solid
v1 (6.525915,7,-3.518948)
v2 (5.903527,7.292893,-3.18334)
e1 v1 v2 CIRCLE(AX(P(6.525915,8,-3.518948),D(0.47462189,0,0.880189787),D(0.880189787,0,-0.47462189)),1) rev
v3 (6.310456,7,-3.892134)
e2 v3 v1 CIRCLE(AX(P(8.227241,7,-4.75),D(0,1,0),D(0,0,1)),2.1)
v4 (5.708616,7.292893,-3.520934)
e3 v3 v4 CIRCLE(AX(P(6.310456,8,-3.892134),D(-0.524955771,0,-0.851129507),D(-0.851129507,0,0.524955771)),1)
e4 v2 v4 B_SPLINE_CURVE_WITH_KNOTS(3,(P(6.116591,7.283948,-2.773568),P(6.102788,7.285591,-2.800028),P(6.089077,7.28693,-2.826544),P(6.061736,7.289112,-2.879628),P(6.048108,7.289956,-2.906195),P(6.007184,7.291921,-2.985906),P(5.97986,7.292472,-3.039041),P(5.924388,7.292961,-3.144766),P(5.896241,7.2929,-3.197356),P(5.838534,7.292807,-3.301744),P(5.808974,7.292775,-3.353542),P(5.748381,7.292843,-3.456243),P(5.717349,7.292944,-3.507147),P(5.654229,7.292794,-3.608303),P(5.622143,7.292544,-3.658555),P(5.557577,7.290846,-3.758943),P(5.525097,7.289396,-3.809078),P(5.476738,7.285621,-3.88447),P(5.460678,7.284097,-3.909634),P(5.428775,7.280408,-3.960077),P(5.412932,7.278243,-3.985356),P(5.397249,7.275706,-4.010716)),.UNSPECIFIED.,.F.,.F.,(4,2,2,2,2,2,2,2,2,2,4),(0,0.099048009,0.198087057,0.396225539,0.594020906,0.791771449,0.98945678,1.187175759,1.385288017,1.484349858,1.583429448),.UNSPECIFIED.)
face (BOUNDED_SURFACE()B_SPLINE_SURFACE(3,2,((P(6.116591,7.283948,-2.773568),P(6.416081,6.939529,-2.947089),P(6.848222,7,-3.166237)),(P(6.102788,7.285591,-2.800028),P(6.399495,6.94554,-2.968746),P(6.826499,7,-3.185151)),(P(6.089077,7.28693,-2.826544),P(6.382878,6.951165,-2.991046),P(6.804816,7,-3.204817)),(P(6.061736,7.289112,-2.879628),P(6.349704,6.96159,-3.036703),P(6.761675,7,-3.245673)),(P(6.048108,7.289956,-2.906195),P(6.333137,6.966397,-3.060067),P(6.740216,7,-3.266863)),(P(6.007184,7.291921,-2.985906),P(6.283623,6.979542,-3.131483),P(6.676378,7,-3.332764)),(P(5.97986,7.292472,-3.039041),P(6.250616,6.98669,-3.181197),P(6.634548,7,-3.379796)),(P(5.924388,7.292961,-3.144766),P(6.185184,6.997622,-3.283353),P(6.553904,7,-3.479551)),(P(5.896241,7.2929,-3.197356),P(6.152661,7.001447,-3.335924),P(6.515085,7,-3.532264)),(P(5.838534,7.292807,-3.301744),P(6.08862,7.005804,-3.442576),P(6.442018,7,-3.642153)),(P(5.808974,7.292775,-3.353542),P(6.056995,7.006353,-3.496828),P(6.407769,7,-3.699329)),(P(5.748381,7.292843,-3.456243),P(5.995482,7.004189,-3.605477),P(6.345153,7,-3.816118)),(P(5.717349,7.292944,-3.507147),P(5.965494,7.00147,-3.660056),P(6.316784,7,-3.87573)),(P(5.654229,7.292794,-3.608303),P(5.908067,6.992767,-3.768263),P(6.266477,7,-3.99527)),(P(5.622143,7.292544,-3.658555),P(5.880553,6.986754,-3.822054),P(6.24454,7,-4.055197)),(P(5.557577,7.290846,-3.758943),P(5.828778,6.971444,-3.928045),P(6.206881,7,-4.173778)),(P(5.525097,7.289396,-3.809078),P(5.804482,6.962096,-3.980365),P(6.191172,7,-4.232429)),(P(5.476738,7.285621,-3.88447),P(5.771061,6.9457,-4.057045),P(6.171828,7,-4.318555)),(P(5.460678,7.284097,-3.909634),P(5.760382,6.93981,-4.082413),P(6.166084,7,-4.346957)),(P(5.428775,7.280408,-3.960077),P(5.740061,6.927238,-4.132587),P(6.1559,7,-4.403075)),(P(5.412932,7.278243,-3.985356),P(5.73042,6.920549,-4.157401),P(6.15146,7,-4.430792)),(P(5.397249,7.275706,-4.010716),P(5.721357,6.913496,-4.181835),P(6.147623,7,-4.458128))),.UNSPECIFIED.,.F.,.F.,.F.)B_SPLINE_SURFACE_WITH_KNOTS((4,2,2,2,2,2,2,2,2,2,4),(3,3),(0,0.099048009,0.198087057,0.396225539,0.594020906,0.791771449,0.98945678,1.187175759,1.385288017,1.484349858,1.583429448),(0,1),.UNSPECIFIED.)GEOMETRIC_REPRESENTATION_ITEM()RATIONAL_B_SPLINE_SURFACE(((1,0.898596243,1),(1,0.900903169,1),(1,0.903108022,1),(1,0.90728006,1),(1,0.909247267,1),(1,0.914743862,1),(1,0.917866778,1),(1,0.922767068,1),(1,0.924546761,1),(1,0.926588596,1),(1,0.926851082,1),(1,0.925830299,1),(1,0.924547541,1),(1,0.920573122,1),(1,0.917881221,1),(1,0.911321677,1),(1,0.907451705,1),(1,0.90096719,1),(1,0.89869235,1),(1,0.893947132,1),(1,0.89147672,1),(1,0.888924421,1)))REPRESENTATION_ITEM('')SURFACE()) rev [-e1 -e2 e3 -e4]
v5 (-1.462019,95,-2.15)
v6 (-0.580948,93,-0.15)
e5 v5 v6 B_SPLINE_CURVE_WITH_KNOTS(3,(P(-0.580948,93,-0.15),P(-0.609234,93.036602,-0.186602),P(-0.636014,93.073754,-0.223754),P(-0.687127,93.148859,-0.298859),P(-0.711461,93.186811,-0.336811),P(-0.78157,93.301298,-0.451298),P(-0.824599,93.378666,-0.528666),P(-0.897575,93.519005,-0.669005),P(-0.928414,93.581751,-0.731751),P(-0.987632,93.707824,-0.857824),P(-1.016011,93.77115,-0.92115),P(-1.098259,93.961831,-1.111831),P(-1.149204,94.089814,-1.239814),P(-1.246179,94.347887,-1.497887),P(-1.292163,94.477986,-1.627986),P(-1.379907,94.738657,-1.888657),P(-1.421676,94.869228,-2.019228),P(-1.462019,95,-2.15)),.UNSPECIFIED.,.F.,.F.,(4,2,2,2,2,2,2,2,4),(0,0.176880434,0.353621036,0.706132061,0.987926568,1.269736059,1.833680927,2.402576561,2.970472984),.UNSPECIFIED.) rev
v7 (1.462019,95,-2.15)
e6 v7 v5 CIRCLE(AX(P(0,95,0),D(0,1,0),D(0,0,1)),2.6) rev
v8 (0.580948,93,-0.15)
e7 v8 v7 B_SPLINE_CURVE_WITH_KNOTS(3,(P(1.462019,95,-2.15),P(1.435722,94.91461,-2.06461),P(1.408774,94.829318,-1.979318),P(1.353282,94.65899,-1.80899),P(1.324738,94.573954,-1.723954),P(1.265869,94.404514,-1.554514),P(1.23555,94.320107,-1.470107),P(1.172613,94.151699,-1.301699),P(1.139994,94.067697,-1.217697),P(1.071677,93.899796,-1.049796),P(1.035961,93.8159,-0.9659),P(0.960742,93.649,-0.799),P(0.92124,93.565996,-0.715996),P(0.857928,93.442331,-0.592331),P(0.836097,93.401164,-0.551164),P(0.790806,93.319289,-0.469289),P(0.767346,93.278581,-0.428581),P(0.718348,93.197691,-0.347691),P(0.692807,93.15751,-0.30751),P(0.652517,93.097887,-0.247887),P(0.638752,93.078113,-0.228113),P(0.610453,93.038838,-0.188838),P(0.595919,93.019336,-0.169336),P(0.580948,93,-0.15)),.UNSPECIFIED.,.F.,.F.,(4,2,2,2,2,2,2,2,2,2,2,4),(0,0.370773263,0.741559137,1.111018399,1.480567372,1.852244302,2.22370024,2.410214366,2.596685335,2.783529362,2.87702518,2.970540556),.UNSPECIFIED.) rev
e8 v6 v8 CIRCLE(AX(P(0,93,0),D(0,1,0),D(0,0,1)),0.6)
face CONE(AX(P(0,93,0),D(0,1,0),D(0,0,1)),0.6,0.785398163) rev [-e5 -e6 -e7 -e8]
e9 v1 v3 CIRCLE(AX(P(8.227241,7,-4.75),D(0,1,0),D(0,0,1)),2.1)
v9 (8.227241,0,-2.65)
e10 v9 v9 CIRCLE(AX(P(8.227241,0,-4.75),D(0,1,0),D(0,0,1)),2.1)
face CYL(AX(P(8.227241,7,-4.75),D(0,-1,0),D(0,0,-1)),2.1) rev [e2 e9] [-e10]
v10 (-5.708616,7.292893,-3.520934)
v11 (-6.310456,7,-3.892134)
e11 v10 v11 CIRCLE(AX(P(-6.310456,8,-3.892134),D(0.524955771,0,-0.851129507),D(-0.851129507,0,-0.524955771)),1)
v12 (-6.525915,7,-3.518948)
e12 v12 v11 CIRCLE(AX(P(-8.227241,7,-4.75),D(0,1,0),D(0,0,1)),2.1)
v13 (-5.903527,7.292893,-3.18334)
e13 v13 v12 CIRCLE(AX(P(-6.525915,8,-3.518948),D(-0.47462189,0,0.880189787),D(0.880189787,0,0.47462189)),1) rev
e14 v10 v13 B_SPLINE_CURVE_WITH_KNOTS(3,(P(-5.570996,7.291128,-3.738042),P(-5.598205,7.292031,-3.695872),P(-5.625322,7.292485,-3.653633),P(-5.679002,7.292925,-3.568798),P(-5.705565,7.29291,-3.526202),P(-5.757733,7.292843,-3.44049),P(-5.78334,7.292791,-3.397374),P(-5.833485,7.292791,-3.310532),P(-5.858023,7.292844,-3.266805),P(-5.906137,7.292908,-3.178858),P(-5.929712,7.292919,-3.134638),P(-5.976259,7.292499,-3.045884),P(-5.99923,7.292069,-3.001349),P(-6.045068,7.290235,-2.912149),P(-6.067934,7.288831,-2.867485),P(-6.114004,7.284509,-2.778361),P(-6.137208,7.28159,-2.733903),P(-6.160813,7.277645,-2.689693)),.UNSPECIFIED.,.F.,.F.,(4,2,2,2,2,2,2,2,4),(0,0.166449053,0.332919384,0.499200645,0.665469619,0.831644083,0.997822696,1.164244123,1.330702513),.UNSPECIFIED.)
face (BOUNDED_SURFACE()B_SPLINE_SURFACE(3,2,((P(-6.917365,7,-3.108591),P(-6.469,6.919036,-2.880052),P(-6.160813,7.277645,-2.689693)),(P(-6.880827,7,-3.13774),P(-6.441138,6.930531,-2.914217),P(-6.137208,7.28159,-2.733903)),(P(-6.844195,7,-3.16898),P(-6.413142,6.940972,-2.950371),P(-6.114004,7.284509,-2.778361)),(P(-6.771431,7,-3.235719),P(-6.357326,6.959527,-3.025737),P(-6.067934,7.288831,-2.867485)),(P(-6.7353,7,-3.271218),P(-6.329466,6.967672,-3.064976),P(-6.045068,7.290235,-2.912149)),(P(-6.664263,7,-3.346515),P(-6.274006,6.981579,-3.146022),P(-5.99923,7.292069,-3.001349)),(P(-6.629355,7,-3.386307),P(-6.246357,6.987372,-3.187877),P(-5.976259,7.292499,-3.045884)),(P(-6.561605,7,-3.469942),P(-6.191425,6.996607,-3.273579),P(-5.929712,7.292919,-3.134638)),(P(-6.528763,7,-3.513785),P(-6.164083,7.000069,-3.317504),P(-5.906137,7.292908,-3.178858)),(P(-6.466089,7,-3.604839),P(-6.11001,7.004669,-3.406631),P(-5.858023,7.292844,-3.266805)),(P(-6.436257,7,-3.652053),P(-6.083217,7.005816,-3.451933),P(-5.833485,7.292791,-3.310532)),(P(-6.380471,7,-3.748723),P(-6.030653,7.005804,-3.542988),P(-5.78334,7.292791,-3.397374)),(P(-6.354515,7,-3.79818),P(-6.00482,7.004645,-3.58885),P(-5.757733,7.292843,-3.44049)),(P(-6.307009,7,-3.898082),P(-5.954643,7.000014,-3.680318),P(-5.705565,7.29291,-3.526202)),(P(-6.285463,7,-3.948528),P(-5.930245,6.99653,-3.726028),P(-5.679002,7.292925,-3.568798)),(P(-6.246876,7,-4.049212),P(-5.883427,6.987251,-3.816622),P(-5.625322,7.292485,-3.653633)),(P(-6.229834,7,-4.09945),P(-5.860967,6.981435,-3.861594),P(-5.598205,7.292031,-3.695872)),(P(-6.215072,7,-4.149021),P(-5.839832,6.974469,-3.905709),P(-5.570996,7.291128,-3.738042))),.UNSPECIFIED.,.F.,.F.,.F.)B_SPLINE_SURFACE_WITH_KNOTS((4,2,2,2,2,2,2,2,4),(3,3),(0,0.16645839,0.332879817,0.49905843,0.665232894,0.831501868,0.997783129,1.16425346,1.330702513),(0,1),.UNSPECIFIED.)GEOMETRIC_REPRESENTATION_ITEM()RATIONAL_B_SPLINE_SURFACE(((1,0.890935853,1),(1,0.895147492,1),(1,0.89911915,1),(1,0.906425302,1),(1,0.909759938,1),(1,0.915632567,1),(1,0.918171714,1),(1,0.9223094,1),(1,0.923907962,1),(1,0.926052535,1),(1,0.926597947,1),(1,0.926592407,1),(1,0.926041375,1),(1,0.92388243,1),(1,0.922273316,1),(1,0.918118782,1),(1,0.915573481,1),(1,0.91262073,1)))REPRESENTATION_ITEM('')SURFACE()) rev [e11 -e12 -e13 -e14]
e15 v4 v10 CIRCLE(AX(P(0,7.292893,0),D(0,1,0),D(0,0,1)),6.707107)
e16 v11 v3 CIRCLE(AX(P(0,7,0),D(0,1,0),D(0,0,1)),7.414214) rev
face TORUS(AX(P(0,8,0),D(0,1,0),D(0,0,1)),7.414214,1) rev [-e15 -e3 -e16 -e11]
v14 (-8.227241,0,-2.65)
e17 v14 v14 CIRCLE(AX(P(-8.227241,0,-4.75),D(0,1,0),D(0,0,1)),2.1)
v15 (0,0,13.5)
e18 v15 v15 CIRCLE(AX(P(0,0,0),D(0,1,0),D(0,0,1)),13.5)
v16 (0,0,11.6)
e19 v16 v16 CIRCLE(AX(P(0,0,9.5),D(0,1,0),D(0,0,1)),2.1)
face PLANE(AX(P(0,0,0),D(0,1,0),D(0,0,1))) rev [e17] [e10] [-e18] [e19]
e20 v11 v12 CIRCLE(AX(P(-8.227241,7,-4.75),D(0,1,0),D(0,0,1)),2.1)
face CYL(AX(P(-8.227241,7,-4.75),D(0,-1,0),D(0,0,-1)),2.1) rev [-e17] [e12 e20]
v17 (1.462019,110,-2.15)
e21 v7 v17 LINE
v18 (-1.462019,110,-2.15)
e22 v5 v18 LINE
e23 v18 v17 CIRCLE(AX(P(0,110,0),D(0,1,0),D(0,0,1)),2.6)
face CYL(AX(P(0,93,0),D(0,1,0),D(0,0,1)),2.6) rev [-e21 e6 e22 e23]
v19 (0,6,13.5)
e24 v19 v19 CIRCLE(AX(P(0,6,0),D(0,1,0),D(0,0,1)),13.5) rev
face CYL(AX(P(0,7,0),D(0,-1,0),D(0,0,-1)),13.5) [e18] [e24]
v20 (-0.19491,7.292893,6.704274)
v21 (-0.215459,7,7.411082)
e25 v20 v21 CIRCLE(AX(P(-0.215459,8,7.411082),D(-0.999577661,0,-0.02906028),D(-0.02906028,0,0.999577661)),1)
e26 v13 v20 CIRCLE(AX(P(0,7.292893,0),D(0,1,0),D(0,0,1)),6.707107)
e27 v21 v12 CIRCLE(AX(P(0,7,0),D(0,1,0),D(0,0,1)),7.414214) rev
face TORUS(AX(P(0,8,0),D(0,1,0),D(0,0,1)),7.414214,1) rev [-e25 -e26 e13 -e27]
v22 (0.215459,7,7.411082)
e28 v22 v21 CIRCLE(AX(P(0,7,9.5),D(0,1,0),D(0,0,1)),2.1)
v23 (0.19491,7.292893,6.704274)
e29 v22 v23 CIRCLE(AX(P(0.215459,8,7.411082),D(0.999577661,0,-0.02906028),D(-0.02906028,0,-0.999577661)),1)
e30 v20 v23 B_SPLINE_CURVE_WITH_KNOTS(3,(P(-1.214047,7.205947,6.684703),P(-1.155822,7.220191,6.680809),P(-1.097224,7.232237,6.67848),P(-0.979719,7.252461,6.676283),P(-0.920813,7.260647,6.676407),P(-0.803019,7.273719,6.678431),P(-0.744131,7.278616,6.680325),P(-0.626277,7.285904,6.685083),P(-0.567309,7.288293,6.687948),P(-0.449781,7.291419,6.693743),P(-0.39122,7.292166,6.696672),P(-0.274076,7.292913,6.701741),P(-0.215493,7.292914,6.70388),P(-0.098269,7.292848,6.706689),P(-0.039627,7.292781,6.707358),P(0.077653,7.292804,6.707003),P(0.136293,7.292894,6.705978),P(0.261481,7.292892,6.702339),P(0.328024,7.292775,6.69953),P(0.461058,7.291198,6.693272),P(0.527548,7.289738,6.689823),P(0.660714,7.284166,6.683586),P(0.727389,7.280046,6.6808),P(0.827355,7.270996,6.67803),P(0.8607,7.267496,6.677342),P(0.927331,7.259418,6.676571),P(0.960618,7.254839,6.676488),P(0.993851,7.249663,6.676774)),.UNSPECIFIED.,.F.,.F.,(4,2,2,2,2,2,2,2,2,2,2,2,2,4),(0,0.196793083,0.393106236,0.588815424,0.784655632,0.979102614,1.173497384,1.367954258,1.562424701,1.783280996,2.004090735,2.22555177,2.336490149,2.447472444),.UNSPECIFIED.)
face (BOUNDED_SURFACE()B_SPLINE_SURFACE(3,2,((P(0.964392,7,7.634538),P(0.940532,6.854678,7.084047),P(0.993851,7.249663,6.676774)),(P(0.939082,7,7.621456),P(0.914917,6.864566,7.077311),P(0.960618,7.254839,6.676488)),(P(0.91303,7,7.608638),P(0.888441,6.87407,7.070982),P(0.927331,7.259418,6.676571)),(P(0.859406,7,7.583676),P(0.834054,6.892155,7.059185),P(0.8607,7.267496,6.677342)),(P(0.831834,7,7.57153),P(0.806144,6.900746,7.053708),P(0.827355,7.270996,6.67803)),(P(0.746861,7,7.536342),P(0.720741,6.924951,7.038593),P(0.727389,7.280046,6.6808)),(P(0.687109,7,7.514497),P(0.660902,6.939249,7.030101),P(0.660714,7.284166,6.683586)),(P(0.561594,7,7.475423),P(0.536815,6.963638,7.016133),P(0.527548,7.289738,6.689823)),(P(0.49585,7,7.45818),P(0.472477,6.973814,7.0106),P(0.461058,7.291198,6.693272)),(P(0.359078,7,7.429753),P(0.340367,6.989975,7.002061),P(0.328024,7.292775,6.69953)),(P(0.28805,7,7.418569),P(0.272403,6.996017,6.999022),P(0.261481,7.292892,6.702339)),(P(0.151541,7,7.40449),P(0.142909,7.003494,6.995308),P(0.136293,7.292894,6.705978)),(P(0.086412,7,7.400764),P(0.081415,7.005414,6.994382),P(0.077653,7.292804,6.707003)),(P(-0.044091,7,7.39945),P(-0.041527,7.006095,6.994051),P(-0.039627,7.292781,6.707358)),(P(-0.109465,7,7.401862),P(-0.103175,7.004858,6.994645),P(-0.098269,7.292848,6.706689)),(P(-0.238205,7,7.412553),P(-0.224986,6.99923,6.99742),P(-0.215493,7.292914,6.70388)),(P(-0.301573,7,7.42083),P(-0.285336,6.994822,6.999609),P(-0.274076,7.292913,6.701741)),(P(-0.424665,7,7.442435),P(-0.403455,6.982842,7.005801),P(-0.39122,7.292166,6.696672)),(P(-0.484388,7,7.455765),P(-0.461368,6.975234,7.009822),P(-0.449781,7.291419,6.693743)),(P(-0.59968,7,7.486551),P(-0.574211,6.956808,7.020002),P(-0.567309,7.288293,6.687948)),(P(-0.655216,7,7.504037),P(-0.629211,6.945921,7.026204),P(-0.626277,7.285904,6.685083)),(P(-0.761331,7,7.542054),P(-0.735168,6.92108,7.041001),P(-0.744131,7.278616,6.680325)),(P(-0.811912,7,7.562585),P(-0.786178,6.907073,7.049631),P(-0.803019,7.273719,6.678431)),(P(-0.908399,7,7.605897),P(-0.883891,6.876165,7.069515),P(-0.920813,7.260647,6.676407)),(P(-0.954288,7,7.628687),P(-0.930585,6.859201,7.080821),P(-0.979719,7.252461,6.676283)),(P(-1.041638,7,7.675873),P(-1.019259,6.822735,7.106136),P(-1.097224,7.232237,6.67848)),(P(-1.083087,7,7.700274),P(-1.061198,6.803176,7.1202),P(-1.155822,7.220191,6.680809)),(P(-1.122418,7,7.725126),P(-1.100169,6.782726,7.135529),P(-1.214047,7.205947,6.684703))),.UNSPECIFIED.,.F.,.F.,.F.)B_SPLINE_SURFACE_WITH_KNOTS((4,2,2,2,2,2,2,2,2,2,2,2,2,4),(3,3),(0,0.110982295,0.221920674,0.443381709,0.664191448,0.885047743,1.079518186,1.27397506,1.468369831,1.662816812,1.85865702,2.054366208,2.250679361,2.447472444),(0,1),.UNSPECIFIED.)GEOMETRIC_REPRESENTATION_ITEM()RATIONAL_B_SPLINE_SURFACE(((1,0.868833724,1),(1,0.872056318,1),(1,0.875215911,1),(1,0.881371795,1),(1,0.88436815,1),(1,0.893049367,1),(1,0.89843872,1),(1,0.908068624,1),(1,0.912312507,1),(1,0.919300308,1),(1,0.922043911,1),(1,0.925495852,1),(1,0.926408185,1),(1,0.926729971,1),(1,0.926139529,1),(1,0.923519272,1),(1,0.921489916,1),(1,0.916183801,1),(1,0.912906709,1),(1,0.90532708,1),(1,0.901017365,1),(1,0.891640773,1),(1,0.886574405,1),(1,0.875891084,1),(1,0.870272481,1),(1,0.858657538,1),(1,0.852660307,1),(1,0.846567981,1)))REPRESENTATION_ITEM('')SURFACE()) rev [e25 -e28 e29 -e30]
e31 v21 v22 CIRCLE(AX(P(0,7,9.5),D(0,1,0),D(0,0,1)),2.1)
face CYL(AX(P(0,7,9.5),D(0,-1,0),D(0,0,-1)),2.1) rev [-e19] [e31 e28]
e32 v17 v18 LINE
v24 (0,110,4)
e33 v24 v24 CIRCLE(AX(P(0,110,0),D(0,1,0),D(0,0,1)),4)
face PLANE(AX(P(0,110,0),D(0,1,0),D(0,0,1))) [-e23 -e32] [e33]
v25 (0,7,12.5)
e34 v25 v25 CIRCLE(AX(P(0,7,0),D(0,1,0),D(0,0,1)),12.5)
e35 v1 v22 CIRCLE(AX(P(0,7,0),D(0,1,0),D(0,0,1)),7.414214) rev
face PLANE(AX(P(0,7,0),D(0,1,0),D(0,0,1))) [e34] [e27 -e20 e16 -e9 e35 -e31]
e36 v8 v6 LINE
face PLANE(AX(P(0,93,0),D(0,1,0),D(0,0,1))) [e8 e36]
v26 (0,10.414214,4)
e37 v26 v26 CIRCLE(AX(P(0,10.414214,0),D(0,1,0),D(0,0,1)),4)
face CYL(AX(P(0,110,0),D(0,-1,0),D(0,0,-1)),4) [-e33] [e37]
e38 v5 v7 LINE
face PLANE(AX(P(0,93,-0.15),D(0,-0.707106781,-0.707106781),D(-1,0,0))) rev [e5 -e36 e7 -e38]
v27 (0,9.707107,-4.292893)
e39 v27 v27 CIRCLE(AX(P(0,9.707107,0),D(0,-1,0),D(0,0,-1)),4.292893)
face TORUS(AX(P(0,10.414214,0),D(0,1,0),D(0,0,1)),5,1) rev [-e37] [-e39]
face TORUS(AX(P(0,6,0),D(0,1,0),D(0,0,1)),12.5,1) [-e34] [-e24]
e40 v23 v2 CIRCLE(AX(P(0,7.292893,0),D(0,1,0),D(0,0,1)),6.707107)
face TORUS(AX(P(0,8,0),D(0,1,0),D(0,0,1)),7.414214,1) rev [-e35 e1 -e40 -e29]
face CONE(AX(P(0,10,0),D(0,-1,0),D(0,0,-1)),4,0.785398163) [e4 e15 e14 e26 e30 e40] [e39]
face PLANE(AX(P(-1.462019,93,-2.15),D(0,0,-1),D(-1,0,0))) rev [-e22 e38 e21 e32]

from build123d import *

# Parameters (mm, degrees)
SKETCH1_R           = 13.5
SKETCH1_R_2         = 2.1
BOSS_EXTRUDE1_DEPTH = 7
BOSS_EXTRUDE2_START = 7
SKETCH1_3_R         = 4
BOSS_EXTRUDE2_DEPTH = 103
CUT_EXTRUDE1_DEPTH  = 17
CHAMFER1_SIZE       = 3
FILLET3_R           = 1
CHAMFER2_SIZE       = 2


with BuildPart() as part:
    # Sketch1 → Boss-Extrude1 (new body)
    with BuildSketch(Plane(origin=(0, 0, 0), x_dir=(1, 0, 0), z_dir=(0, 1, 0))):
        with Locations(Location((0, 0, 0), (0, 0, 270))):
            Circle(SKETCH1_R)
        with Locations(Location((0, -9.5, 0), (0, 0, 270))):
            Circle(SKETCH1_R_2, mode=Mode.SUBTRACT)
        with Locations(Location((-8.227241336, 4.75, 0), (0, 0, 270))):
            Circle(SKETCH1_R_2, mode=Mode.SUBTRACT)
        with Locations(Location((8.227241336, 4.75, 0), (0, 0, 270))):
            Circle(SKETCH1_R_2, mode=Mode.SUBTRACT)
    extrude(amount=BOSS_EXTRUDE1_DEPTH)

    # Sketch1<3> → Boss-Extrude2 (add)
    with BuildSketch(Plane(origin=(0, 0, 0), x_dir=(1, 0, 0), z_dir=(0, 1, 0)).offset(BOSS_EXTRUDE2_START)):
        with Locations(Location((0, 0, 0), (0, 0, 270))):
            Circle(SKETCH1_3_R)
    extrude(amount=BOSS_EXTRUDE2_DEPTH)

    # Sketch2 → Cut-Extrude1 (cut)
    with BuildSketch(Plane(origin=(0, 110, 0), x_dir=(1, 0, 0), z_dir=(0, 1, 0))):
        with BuildLine():
            Line((-1.462019152, 2.15), (1.462019152, 2.15))
            ThreePointArc((1.462019152, 2.15), (0, -2.6), (-1.462019152, 2.15))
        make_face()
    extrude(amount=-CUT_EXTRUDE1_DEPTH, mode=Mode.SUBTRACT)

    # Chamfer1
    chamfer1_edges = [part.edges().sort_by_distance(p)[0] for p in [
        (0, 7, -4),
    ]]
    chamfer(chamfer1_edges, length=CHAMFER1_SIZE)

    # Fillet3
    fillet3_edges = [part.edges().sort_by_distance(p)[0] for p in [
        (0, 7, -13.5),
        (0, 10, -4),
        (0, 7, -7),
    ]]
    fillet(fillet3_edges, radius=FILLET3_R)

    # Chamfer2
    # the kernel refuses this chamfer: 2 mm, written as the material it adds along each edge
    with BuildSketch(Plane(origin=(0, 93, 0), x_dir=(0.003141587485879782, 0, -0.9999950652018581), z_dir=(-0.9999950652018581, 0, -0.003141587485879782))) as chamfer2_piece_1:
        Polygon((2.6, -CHAMFER2_SIZE), (2.6 - CHAMFER2_SIZE, 0), (2.6, 0), align=None)
    revolve(axis=Axis((0, 93, 0), (0, -1, 0)), revolution_arc=359.64)
    with BuildSketch(Plane(origin=(-6.605385128, 93, -2.15), x_dir=(0, 0.9996219169112968, -0.0274958766105862), z_dir=(1, 0, 0))) as chamfer2_piece_2_section:
        Polygon((CHAMFER2_SIZE * 0.999621916911, CHAMFER2_SIZE * 0.0274958766106), (-CHAMFER2_SIZE * 0.0274958766106, CHAMFER2_SIZE * 0.999621916911), (0, 0), align=None)
    chamfer2_piece_2 = extrude(amount=13.210770255, mode=Mode.PRIVATE)
    chamfer2_piece_2 = chamfer2_piece_2 & Plane(origin=(0, 93.615158387, 0), x_dir=(0.5623150583543634, 0, -0.826923076923077), z_dir=(0, 1, 0)) * Cylinder(2.6, 35, mode=Mode.PRIVATE)
    add(chamfer2_piece_2)


solid = part.part
